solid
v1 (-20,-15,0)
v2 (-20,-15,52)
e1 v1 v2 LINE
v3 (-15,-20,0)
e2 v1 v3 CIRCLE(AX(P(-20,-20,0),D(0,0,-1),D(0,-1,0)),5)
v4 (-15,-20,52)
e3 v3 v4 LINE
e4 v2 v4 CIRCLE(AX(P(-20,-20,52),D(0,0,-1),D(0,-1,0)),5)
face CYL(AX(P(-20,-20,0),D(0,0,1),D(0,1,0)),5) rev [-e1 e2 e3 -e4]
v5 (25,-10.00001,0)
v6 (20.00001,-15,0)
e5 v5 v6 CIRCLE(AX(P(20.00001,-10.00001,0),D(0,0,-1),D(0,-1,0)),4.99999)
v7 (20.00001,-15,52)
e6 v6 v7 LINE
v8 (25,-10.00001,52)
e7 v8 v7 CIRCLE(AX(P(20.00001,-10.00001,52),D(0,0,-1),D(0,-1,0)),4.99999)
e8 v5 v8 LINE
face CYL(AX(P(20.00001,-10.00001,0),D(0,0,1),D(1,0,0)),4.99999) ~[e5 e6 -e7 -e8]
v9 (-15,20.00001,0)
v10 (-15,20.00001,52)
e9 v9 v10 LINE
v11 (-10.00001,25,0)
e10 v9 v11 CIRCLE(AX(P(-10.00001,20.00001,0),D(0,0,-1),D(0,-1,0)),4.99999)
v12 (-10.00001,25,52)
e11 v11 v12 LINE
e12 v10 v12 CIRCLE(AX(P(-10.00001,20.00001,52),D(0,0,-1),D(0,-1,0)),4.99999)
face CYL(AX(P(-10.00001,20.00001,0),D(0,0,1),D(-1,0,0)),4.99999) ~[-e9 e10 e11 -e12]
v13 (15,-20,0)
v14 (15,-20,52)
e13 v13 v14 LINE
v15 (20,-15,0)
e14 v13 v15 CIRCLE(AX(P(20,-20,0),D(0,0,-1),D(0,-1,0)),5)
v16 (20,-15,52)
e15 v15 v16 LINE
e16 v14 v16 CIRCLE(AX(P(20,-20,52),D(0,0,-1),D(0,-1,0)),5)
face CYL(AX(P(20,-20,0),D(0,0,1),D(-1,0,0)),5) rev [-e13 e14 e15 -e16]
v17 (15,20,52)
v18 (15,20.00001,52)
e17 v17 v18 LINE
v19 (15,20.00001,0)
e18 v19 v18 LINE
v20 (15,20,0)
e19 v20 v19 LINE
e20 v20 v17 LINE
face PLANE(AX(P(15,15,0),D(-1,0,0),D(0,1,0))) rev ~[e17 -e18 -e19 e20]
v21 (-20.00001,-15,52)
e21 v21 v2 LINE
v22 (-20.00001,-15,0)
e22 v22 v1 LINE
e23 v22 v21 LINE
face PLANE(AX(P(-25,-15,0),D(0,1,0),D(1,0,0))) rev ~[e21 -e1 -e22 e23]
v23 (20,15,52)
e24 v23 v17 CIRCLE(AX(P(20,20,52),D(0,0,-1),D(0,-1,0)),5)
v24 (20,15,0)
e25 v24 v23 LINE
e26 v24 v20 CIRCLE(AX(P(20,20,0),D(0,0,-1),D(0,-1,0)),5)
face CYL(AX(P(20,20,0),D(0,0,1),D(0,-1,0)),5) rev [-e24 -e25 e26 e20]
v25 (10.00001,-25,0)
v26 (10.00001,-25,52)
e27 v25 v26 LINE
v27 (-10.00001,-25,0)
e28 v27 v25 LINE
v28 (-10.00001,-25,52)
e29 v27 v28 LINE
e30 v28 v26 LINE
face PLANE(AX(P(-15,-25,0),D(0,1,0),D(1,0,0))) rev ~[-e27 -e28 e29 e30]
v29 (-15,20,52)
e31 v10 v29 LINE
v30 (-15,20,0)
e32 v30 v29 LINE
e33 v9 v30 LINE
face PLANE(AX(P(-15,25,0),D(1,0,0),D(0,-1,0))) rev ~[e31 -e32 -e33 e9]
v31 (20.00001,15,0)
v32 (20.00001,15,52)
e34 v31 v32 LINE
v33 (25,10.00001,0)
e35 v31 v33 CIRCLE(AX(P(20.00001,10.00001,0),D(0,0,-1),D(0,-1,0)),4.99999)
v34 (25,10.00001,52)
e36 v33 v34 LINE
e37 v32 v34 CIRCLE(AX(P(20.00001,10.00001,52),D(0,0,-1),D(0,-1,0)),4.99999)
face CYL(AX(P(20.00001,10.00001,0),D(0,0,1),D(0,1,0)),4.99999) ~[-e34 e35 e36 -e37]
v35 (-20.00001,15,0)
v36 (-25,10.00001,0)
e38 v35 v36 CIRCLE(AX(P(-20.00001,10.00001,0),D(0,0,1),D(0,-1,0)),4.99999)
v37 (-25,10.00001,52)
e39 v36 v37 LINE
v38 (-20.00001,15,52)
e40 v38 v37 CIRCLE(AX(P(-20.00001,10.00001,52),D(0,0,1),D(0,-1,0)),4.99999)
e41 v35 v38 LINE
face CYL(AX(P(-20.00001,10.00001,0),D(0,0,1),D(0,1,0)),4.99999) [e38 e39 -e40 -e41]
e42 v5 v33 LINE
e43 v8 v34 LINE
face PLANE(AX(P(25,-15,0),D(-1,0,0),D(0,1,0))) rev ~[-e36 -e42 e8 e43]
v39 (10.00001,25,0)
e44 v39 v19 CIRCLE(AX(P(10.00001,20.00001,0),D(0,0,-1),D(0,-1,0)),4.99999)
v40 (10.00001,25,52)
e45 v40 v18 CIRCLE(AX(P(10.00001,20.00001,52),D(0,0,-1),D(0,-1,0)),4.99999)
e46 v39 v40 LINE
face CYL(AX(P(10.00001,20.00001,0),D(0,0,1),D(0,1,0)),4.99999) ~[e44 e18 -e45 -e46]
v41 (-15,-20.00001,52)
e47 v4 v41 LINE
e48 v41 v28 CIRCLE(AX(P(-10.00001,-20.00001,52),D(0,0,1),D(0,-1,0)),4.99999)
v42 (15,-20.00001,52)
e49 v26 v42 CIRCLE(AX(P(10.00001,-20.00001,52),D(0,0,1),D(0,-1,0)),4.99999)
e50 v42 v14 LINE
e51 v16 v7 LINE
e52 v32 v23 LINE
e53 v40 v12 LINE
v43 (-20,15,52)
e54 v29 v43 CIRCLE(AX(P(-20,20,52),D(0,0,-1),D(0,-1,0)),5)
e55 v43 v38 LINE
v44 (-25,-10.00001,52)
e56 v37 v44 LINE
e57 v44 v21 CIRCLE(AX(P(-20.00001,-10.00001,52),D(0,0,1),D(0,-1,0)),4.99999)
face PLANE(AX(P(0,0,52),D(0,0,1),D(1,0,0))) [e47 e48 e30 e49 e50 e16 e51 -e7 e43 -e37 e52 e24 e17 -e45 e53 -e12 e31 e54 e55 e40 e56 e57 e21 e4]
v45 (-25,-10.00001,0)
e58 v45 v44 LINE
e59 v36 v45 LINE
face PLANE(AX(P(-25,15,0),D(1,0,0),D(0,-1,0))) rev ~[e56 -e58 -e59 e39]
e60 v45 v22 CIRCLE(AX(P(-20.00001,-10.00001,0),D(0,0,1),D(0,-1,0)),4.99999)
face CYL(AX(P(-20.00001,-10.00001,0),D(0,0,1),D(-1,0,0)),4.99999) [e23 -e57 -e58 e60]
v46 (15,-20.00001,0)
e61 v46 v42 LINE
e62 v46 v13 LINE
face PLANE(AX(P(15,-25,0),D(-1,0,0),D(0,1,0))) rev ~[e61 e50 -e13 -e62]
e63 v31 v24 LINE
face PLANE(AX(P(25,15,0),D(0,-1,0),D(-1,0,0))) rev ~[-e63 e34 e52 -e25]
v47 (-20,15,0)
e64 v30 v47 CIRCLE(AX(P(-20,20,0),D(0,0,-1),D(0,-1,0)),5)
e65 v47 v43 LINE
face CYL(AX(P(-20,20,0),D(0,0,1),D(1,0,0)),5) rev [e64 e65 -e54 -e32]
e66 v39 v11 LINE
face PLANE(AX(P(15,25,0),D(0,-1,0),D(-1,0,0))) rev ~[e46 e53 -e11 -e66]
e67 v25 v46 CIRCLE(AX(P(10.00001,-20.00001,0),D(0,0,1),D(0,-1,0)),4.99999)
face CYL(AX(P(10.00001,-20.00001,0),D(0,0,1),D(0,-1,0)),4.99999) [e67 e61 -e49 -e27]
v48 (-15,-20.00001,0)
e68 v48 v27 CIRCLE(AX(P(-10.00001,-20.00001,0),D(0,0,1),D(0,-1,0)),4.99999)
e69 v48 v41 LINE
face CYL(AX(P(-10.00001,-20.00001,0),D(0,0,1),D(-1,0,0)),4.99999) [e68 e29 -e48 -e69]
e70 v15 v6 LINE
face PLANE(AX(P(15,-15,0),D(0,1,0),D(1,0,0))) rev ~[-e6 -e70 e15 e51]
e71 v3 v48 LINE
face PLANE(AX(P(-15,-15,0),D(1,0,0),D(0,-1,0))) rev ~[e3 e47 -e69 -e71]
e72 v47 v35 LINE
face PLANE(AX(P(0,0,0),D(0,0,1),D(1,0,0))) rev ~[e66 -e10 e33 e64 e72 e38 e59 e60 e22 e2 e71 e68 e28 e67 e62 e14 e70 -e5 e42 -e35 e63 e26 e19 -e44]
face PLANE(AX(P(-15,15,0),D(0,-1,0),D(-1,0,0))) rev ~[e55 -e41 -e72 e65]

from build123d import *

# Parameters (mm, degrees)
F1_DEPTH = 52
F2_R     = 5
F3_R     = 4.99999


# Not quite as in the source:
# - a fillet or chamfer is up to 0.001 mm smaller than in the source, because OpenCascade refuses the exact size


with BuildPart() as f1:
    # F0 (on Top) → F1 (new body)
    with BuildSketch(Plane.XY):
        Polygon((15, 25), (-15, 25), (-15, 15), (-25, 15), (-25, -15), (-15, -15), (-15, -25), (15, -25), (15, -15), (25, -15), (25, 15), (15, 15), align=None)
    extrude(amount=F1_DEPTH)

    # F2
    f2_edges = [f1.edges().sort_by_distance(p)[0] for p in [
        (-15, -15, 26),
        (15, -15, 26),
        (15, 15, 26),
        (-15, 15, 26),
    ]]
    fillet(f2_edges, radius=F2_R)

    # F3 (radius 5 in the source; OpenCascade refuses exactly that, so slightly less here)
    f3_edges = [f1.edges().sort_by_distance(p)[0] for p in [
        (25, 15, 26),
        (-15, 25, 26),
        (-25, 15, 26),
        (25, -15, 26),
        (15, -25, 26),
        (-15, -25, 26),
        (-25, -15, 26),
        (15, 25, 26),
    ]]
    fillet(f3_edges, radius=F3_R)


solid = f1.part
